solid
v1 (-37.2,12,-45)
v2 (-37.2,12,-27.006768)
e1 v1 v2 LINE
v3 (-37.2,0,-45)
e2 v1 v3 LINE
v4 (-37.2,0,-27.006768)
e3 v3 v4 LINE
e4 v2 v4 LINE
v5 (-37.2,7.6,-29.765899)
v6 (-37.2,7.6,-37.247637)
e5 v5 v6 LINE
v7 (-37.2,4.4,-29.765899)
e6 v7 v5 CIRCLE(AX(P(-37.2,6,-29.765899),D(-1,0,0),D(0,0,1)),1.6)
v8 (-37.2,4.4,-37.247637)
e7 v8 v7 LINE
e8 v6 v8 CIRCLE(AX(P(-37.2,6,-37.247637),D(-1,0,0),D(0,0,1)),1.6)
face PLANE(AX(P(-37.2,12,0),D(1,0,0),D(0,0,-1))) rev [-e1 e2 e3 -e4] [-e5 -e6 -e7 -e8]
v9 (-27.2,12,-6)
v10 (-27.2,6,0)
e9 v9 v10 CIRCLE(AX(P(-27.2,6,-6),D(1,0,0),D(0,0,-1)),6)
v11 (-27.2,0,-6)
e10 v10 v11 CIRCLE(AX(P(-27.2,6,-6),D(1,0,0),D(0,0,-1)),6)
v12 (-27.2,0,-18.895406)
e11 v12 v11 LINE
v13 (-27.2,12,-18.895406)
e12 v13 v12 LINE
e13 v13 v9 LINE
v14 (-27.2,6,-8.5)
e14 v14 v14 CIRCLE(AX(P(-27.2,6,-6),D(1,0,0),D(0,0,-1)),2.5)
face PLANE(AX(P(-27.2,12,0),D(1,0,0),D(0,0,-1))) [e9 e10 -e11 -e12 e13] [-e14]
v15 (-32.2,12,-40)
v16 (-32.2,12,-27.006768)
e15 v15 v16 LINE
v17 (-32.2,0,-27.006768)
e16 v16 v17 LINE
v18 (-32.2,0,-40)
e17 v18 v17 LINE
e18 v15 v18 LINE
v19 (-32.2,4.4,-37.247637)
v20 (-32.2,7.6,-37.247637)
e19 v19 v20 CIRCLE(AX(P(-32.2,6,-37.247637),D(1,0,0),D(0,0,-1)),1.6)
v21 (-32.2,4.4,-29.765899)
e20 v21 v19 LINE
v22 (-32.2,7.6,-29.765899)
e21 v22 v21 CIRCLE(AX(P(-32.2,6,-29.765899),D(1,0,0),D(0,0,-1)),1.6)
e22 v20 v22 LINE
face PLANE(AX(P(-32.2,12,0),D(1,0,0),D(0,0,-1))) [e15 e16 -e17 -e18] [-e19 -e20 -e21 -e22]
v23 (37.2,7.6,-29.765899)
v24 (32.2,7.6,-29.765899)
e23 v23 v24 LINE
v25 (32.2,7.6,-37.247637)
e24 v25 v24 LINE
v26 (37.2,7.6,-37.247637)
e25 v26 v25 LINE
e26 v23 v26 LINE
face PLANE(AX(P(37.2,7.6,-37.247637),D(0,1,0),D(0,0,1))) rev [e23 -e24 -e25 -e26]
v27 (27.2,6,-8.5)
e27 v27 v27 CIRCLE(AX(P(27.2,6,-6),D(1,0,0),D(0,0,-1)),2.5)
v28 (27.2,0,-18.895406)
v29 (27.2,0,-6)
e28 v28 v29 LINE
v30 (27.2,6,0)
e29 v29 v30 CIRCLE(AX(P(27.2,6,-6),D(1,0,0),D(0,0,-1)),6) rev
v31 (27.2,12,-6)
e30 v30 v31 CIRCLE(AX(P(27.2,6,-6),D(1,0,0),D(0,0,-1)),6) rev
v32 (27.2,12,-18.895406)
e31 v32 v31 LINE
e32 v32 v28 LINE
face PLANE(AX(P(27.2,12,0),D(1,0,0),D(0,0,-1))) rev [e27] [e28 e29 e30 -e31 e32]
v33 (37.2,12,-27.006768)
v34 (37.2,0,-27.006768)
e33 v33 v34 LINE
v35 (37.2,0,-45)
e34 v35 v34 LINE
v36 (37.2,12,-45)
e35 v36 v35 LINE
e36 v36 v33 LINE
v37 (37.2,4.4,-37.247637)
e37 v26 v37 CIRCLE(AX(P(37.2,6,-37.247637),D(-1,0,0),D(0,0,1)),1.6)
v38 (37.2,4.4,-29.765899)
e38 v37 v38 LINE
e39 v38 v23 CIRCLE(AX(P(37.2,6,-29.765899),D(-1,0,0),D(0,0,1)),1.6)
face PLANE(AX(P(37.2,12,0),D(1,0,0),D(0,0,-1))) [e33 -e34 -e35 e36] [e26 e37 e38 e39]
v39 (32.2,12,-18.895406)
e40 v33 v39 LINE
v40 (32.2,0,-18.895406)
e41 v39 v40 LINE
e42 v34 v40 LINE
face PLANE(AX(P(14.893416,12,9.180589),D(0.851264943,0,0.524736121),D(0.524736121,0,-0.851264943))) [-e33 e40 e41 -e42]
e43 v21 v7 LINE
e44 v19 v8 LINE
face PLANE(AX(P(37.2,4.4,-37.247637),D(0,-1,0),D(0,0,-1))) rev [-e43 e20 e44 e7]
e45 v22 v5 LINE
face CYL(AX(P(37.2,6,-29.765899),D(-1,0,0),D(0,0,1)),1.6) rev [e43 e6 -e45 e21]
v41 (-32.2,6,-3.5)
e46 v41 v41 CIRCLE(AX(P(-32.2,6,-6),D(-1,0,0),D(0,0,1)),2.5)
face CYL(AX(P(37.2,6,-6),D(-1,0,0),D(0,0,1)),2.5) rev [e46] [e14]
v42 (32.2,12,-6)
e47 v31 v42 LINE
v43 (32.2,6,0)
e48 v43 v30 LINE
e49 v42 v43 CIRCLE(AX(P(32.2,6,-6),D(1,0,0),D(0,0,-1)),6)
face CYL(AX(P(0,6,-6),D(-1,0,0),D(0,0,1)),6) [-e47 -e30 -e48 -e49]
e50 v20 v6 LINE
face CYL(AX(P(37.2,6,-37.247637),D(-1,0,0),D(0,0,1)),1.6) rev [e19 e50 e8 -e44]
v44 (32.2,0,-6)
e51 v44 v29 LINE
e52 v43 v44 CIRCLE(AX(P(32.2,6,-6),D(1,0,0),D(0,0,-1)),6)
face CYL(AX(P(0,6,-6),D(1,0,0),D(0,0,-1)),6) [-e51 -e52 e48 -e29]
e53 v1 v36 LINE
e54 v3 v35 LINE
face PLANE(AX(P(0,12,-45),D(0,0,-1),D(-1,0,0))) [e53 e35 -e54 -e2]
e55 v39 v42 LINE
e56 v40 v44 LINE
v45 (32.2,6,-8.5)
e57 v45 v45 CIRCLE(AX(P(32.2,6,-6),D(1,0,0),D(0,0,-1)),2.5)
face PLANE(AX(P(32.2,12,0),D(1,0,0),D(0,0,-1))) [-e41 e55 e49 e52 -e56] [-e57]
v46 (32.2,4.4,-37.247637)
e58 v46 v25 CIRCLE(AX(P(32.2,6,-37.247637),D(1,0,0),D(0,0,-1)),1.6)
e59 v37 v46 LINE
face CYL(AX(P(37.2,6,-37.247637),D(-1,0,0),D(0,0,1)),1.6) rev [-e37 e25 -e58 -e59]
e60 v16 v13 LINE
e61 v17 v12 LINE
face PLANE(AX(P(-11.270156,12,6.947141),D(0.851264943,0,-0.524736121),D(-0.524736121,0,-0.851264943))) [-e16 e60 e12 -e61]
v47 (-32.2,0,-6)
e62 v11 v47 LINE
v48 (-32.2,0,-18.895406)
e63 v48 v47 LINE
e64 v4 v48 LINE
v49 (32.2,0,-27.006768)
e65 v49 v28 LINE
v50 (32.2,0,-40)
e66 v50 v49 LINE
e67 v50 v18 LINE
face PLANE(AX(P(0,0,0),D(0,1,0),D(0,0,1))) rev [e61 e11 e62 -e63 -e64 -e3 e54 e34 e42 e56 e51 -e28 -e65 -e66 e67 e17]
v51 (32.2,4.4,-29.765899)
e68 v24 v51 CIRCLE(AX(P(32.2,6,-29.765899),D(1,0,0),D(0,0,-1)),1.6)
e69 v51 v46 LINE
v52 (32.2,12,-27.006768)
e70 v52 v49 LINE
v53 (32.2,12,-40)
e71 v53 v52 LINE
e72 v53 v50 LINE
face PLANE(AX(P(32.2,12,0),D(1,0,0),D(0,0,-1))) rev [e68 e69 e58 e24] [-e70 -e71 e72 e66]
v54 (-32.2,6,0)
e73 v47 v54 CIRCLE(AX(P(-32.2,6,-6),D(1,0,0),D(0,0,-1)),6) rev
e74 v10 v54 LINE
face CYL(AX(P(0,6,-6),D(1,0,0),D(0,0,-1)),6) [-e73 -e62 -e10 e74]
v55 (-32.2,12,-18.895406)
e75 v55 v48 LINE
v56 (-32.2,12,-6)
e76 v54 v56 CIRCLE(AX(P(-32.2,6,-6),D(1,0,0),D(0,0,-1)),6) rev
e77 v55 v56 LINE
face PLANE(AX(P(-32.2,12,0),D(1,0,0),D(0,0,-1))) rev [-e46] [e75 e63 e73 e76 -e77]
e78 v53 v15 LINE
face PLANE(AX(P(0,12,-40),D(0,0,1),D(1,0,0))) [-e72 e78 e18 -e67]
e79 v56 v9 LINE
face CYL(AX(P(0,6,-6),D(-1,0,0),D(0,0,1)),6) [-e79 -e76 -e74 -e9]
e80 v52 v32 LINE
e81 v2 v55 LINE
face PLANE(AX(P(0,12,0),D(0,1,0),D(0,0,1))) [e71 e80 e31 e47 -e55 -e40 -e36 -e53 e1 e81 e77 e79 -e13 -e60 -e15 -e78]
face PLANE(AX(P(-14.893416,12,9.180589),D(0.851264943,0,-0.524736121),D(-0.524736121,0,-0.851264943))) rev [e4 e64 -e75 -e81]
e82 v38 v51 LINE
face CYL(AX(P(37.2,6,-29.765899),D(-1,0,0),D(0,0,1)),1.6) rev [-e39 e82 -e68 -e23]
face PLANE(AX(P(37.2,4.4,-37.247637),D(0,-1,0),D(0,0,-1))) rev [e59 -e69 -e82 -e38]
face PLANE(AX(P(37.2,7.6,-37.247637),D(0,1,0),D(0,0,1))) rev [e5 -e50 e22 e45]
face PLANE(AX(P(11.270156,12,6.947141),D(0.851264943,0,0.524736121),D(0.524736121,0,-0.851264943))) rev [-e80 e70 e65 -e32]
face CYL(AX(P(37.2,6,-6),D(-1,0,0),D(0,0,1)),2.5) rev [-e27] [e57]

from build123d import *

# Parameters (mm, degrees)
BOSS_EXTRU_1_DEPTH      = 12
ESQUISSE2_R             = 2.5
ENL_V_MAT_EXTRU_1_DEPTH = 84.578466126
ENL_V_MAT_EXTRU_2_DEPTH = 88.774483764
CONG_1_R                = 6


with BuildPart() as part:
    # Esquisse1 → Boss.-Extru.1 (new body)
    with BuildSketch(Plane(origin=(0, 0, 0), x_dir=(1, 0, 0), z_dir=(0, 1, 0))):
        Polygon((-32.2, 27.00676783), (-32.2, 18.895405671), (-37.2, 27.00676783), (-37.2, 45), (37.2, 45), (37.2, 27.00676783), (32.2, 18.895405671), (32.2, 0), (27.2, 0), (27.2, 18.895405671), (32.2, 27.00676783), (32.2, 40), (-32.2, 40), align=None)
        Polygon((-32.2, 27.00676783), (-27.2, 18.895405671), (-27.2, 0), (-32.2, 0), (-32.2, 18.895405671), align=None)
    extrude(amount=BOSS_EXTRU_1_DEPTH)

    # Esquisse2 → Enlèv. mat.-Extru.1 (cut, through all)
    with BuildSketch(Plane.ZY.offset(32.2)):
        with Locations((-6, 6)):
            Circle(ESQUISSE2_R)
    extrude(amount=-ENL_V_MAT_EXTRU_1_DEPTH, mode=Mode.SUBTRACT)

    # Esquisse5 → Enlèv. mat.-Extru.2 (cut, through all)
    with BuildSketch(Plane.ZY.offset(37.2)):
        with BuildLine():
            Line((-37.247636958, 7.6), (-29.765898702, 7.6))
            ThreePointArc((-29.765898702, 7.6), (-28.165898702, 6), (-29.765898702, 4.4))
            Line((-29.765898702, 4.4), (-37.247636958, 4.4))
            ThreePointArc((-37.247636958, 4.4), (-38.847636958, 6), (-37.247636958, 7.6))
        make_face()
    extrude(amount=-ENL_V_MAT_EXTRU_2_DEPTH, mode=Mode.SUBTRACT)

    # Congé1
    cong_1_edges = [part.edges().sort_by_distance(p)[0] for p in [
        (-29.7, 0, 0),
        (-29.7, 12, 0),
        (29.7, 0, 0),
        (29.7, 12, 0),
    ]]
    fillet(cong_1_edges, radius=CONG_1_R - 0.0001)  # a hair under: the kernel refuses the full size


solid = part.part
